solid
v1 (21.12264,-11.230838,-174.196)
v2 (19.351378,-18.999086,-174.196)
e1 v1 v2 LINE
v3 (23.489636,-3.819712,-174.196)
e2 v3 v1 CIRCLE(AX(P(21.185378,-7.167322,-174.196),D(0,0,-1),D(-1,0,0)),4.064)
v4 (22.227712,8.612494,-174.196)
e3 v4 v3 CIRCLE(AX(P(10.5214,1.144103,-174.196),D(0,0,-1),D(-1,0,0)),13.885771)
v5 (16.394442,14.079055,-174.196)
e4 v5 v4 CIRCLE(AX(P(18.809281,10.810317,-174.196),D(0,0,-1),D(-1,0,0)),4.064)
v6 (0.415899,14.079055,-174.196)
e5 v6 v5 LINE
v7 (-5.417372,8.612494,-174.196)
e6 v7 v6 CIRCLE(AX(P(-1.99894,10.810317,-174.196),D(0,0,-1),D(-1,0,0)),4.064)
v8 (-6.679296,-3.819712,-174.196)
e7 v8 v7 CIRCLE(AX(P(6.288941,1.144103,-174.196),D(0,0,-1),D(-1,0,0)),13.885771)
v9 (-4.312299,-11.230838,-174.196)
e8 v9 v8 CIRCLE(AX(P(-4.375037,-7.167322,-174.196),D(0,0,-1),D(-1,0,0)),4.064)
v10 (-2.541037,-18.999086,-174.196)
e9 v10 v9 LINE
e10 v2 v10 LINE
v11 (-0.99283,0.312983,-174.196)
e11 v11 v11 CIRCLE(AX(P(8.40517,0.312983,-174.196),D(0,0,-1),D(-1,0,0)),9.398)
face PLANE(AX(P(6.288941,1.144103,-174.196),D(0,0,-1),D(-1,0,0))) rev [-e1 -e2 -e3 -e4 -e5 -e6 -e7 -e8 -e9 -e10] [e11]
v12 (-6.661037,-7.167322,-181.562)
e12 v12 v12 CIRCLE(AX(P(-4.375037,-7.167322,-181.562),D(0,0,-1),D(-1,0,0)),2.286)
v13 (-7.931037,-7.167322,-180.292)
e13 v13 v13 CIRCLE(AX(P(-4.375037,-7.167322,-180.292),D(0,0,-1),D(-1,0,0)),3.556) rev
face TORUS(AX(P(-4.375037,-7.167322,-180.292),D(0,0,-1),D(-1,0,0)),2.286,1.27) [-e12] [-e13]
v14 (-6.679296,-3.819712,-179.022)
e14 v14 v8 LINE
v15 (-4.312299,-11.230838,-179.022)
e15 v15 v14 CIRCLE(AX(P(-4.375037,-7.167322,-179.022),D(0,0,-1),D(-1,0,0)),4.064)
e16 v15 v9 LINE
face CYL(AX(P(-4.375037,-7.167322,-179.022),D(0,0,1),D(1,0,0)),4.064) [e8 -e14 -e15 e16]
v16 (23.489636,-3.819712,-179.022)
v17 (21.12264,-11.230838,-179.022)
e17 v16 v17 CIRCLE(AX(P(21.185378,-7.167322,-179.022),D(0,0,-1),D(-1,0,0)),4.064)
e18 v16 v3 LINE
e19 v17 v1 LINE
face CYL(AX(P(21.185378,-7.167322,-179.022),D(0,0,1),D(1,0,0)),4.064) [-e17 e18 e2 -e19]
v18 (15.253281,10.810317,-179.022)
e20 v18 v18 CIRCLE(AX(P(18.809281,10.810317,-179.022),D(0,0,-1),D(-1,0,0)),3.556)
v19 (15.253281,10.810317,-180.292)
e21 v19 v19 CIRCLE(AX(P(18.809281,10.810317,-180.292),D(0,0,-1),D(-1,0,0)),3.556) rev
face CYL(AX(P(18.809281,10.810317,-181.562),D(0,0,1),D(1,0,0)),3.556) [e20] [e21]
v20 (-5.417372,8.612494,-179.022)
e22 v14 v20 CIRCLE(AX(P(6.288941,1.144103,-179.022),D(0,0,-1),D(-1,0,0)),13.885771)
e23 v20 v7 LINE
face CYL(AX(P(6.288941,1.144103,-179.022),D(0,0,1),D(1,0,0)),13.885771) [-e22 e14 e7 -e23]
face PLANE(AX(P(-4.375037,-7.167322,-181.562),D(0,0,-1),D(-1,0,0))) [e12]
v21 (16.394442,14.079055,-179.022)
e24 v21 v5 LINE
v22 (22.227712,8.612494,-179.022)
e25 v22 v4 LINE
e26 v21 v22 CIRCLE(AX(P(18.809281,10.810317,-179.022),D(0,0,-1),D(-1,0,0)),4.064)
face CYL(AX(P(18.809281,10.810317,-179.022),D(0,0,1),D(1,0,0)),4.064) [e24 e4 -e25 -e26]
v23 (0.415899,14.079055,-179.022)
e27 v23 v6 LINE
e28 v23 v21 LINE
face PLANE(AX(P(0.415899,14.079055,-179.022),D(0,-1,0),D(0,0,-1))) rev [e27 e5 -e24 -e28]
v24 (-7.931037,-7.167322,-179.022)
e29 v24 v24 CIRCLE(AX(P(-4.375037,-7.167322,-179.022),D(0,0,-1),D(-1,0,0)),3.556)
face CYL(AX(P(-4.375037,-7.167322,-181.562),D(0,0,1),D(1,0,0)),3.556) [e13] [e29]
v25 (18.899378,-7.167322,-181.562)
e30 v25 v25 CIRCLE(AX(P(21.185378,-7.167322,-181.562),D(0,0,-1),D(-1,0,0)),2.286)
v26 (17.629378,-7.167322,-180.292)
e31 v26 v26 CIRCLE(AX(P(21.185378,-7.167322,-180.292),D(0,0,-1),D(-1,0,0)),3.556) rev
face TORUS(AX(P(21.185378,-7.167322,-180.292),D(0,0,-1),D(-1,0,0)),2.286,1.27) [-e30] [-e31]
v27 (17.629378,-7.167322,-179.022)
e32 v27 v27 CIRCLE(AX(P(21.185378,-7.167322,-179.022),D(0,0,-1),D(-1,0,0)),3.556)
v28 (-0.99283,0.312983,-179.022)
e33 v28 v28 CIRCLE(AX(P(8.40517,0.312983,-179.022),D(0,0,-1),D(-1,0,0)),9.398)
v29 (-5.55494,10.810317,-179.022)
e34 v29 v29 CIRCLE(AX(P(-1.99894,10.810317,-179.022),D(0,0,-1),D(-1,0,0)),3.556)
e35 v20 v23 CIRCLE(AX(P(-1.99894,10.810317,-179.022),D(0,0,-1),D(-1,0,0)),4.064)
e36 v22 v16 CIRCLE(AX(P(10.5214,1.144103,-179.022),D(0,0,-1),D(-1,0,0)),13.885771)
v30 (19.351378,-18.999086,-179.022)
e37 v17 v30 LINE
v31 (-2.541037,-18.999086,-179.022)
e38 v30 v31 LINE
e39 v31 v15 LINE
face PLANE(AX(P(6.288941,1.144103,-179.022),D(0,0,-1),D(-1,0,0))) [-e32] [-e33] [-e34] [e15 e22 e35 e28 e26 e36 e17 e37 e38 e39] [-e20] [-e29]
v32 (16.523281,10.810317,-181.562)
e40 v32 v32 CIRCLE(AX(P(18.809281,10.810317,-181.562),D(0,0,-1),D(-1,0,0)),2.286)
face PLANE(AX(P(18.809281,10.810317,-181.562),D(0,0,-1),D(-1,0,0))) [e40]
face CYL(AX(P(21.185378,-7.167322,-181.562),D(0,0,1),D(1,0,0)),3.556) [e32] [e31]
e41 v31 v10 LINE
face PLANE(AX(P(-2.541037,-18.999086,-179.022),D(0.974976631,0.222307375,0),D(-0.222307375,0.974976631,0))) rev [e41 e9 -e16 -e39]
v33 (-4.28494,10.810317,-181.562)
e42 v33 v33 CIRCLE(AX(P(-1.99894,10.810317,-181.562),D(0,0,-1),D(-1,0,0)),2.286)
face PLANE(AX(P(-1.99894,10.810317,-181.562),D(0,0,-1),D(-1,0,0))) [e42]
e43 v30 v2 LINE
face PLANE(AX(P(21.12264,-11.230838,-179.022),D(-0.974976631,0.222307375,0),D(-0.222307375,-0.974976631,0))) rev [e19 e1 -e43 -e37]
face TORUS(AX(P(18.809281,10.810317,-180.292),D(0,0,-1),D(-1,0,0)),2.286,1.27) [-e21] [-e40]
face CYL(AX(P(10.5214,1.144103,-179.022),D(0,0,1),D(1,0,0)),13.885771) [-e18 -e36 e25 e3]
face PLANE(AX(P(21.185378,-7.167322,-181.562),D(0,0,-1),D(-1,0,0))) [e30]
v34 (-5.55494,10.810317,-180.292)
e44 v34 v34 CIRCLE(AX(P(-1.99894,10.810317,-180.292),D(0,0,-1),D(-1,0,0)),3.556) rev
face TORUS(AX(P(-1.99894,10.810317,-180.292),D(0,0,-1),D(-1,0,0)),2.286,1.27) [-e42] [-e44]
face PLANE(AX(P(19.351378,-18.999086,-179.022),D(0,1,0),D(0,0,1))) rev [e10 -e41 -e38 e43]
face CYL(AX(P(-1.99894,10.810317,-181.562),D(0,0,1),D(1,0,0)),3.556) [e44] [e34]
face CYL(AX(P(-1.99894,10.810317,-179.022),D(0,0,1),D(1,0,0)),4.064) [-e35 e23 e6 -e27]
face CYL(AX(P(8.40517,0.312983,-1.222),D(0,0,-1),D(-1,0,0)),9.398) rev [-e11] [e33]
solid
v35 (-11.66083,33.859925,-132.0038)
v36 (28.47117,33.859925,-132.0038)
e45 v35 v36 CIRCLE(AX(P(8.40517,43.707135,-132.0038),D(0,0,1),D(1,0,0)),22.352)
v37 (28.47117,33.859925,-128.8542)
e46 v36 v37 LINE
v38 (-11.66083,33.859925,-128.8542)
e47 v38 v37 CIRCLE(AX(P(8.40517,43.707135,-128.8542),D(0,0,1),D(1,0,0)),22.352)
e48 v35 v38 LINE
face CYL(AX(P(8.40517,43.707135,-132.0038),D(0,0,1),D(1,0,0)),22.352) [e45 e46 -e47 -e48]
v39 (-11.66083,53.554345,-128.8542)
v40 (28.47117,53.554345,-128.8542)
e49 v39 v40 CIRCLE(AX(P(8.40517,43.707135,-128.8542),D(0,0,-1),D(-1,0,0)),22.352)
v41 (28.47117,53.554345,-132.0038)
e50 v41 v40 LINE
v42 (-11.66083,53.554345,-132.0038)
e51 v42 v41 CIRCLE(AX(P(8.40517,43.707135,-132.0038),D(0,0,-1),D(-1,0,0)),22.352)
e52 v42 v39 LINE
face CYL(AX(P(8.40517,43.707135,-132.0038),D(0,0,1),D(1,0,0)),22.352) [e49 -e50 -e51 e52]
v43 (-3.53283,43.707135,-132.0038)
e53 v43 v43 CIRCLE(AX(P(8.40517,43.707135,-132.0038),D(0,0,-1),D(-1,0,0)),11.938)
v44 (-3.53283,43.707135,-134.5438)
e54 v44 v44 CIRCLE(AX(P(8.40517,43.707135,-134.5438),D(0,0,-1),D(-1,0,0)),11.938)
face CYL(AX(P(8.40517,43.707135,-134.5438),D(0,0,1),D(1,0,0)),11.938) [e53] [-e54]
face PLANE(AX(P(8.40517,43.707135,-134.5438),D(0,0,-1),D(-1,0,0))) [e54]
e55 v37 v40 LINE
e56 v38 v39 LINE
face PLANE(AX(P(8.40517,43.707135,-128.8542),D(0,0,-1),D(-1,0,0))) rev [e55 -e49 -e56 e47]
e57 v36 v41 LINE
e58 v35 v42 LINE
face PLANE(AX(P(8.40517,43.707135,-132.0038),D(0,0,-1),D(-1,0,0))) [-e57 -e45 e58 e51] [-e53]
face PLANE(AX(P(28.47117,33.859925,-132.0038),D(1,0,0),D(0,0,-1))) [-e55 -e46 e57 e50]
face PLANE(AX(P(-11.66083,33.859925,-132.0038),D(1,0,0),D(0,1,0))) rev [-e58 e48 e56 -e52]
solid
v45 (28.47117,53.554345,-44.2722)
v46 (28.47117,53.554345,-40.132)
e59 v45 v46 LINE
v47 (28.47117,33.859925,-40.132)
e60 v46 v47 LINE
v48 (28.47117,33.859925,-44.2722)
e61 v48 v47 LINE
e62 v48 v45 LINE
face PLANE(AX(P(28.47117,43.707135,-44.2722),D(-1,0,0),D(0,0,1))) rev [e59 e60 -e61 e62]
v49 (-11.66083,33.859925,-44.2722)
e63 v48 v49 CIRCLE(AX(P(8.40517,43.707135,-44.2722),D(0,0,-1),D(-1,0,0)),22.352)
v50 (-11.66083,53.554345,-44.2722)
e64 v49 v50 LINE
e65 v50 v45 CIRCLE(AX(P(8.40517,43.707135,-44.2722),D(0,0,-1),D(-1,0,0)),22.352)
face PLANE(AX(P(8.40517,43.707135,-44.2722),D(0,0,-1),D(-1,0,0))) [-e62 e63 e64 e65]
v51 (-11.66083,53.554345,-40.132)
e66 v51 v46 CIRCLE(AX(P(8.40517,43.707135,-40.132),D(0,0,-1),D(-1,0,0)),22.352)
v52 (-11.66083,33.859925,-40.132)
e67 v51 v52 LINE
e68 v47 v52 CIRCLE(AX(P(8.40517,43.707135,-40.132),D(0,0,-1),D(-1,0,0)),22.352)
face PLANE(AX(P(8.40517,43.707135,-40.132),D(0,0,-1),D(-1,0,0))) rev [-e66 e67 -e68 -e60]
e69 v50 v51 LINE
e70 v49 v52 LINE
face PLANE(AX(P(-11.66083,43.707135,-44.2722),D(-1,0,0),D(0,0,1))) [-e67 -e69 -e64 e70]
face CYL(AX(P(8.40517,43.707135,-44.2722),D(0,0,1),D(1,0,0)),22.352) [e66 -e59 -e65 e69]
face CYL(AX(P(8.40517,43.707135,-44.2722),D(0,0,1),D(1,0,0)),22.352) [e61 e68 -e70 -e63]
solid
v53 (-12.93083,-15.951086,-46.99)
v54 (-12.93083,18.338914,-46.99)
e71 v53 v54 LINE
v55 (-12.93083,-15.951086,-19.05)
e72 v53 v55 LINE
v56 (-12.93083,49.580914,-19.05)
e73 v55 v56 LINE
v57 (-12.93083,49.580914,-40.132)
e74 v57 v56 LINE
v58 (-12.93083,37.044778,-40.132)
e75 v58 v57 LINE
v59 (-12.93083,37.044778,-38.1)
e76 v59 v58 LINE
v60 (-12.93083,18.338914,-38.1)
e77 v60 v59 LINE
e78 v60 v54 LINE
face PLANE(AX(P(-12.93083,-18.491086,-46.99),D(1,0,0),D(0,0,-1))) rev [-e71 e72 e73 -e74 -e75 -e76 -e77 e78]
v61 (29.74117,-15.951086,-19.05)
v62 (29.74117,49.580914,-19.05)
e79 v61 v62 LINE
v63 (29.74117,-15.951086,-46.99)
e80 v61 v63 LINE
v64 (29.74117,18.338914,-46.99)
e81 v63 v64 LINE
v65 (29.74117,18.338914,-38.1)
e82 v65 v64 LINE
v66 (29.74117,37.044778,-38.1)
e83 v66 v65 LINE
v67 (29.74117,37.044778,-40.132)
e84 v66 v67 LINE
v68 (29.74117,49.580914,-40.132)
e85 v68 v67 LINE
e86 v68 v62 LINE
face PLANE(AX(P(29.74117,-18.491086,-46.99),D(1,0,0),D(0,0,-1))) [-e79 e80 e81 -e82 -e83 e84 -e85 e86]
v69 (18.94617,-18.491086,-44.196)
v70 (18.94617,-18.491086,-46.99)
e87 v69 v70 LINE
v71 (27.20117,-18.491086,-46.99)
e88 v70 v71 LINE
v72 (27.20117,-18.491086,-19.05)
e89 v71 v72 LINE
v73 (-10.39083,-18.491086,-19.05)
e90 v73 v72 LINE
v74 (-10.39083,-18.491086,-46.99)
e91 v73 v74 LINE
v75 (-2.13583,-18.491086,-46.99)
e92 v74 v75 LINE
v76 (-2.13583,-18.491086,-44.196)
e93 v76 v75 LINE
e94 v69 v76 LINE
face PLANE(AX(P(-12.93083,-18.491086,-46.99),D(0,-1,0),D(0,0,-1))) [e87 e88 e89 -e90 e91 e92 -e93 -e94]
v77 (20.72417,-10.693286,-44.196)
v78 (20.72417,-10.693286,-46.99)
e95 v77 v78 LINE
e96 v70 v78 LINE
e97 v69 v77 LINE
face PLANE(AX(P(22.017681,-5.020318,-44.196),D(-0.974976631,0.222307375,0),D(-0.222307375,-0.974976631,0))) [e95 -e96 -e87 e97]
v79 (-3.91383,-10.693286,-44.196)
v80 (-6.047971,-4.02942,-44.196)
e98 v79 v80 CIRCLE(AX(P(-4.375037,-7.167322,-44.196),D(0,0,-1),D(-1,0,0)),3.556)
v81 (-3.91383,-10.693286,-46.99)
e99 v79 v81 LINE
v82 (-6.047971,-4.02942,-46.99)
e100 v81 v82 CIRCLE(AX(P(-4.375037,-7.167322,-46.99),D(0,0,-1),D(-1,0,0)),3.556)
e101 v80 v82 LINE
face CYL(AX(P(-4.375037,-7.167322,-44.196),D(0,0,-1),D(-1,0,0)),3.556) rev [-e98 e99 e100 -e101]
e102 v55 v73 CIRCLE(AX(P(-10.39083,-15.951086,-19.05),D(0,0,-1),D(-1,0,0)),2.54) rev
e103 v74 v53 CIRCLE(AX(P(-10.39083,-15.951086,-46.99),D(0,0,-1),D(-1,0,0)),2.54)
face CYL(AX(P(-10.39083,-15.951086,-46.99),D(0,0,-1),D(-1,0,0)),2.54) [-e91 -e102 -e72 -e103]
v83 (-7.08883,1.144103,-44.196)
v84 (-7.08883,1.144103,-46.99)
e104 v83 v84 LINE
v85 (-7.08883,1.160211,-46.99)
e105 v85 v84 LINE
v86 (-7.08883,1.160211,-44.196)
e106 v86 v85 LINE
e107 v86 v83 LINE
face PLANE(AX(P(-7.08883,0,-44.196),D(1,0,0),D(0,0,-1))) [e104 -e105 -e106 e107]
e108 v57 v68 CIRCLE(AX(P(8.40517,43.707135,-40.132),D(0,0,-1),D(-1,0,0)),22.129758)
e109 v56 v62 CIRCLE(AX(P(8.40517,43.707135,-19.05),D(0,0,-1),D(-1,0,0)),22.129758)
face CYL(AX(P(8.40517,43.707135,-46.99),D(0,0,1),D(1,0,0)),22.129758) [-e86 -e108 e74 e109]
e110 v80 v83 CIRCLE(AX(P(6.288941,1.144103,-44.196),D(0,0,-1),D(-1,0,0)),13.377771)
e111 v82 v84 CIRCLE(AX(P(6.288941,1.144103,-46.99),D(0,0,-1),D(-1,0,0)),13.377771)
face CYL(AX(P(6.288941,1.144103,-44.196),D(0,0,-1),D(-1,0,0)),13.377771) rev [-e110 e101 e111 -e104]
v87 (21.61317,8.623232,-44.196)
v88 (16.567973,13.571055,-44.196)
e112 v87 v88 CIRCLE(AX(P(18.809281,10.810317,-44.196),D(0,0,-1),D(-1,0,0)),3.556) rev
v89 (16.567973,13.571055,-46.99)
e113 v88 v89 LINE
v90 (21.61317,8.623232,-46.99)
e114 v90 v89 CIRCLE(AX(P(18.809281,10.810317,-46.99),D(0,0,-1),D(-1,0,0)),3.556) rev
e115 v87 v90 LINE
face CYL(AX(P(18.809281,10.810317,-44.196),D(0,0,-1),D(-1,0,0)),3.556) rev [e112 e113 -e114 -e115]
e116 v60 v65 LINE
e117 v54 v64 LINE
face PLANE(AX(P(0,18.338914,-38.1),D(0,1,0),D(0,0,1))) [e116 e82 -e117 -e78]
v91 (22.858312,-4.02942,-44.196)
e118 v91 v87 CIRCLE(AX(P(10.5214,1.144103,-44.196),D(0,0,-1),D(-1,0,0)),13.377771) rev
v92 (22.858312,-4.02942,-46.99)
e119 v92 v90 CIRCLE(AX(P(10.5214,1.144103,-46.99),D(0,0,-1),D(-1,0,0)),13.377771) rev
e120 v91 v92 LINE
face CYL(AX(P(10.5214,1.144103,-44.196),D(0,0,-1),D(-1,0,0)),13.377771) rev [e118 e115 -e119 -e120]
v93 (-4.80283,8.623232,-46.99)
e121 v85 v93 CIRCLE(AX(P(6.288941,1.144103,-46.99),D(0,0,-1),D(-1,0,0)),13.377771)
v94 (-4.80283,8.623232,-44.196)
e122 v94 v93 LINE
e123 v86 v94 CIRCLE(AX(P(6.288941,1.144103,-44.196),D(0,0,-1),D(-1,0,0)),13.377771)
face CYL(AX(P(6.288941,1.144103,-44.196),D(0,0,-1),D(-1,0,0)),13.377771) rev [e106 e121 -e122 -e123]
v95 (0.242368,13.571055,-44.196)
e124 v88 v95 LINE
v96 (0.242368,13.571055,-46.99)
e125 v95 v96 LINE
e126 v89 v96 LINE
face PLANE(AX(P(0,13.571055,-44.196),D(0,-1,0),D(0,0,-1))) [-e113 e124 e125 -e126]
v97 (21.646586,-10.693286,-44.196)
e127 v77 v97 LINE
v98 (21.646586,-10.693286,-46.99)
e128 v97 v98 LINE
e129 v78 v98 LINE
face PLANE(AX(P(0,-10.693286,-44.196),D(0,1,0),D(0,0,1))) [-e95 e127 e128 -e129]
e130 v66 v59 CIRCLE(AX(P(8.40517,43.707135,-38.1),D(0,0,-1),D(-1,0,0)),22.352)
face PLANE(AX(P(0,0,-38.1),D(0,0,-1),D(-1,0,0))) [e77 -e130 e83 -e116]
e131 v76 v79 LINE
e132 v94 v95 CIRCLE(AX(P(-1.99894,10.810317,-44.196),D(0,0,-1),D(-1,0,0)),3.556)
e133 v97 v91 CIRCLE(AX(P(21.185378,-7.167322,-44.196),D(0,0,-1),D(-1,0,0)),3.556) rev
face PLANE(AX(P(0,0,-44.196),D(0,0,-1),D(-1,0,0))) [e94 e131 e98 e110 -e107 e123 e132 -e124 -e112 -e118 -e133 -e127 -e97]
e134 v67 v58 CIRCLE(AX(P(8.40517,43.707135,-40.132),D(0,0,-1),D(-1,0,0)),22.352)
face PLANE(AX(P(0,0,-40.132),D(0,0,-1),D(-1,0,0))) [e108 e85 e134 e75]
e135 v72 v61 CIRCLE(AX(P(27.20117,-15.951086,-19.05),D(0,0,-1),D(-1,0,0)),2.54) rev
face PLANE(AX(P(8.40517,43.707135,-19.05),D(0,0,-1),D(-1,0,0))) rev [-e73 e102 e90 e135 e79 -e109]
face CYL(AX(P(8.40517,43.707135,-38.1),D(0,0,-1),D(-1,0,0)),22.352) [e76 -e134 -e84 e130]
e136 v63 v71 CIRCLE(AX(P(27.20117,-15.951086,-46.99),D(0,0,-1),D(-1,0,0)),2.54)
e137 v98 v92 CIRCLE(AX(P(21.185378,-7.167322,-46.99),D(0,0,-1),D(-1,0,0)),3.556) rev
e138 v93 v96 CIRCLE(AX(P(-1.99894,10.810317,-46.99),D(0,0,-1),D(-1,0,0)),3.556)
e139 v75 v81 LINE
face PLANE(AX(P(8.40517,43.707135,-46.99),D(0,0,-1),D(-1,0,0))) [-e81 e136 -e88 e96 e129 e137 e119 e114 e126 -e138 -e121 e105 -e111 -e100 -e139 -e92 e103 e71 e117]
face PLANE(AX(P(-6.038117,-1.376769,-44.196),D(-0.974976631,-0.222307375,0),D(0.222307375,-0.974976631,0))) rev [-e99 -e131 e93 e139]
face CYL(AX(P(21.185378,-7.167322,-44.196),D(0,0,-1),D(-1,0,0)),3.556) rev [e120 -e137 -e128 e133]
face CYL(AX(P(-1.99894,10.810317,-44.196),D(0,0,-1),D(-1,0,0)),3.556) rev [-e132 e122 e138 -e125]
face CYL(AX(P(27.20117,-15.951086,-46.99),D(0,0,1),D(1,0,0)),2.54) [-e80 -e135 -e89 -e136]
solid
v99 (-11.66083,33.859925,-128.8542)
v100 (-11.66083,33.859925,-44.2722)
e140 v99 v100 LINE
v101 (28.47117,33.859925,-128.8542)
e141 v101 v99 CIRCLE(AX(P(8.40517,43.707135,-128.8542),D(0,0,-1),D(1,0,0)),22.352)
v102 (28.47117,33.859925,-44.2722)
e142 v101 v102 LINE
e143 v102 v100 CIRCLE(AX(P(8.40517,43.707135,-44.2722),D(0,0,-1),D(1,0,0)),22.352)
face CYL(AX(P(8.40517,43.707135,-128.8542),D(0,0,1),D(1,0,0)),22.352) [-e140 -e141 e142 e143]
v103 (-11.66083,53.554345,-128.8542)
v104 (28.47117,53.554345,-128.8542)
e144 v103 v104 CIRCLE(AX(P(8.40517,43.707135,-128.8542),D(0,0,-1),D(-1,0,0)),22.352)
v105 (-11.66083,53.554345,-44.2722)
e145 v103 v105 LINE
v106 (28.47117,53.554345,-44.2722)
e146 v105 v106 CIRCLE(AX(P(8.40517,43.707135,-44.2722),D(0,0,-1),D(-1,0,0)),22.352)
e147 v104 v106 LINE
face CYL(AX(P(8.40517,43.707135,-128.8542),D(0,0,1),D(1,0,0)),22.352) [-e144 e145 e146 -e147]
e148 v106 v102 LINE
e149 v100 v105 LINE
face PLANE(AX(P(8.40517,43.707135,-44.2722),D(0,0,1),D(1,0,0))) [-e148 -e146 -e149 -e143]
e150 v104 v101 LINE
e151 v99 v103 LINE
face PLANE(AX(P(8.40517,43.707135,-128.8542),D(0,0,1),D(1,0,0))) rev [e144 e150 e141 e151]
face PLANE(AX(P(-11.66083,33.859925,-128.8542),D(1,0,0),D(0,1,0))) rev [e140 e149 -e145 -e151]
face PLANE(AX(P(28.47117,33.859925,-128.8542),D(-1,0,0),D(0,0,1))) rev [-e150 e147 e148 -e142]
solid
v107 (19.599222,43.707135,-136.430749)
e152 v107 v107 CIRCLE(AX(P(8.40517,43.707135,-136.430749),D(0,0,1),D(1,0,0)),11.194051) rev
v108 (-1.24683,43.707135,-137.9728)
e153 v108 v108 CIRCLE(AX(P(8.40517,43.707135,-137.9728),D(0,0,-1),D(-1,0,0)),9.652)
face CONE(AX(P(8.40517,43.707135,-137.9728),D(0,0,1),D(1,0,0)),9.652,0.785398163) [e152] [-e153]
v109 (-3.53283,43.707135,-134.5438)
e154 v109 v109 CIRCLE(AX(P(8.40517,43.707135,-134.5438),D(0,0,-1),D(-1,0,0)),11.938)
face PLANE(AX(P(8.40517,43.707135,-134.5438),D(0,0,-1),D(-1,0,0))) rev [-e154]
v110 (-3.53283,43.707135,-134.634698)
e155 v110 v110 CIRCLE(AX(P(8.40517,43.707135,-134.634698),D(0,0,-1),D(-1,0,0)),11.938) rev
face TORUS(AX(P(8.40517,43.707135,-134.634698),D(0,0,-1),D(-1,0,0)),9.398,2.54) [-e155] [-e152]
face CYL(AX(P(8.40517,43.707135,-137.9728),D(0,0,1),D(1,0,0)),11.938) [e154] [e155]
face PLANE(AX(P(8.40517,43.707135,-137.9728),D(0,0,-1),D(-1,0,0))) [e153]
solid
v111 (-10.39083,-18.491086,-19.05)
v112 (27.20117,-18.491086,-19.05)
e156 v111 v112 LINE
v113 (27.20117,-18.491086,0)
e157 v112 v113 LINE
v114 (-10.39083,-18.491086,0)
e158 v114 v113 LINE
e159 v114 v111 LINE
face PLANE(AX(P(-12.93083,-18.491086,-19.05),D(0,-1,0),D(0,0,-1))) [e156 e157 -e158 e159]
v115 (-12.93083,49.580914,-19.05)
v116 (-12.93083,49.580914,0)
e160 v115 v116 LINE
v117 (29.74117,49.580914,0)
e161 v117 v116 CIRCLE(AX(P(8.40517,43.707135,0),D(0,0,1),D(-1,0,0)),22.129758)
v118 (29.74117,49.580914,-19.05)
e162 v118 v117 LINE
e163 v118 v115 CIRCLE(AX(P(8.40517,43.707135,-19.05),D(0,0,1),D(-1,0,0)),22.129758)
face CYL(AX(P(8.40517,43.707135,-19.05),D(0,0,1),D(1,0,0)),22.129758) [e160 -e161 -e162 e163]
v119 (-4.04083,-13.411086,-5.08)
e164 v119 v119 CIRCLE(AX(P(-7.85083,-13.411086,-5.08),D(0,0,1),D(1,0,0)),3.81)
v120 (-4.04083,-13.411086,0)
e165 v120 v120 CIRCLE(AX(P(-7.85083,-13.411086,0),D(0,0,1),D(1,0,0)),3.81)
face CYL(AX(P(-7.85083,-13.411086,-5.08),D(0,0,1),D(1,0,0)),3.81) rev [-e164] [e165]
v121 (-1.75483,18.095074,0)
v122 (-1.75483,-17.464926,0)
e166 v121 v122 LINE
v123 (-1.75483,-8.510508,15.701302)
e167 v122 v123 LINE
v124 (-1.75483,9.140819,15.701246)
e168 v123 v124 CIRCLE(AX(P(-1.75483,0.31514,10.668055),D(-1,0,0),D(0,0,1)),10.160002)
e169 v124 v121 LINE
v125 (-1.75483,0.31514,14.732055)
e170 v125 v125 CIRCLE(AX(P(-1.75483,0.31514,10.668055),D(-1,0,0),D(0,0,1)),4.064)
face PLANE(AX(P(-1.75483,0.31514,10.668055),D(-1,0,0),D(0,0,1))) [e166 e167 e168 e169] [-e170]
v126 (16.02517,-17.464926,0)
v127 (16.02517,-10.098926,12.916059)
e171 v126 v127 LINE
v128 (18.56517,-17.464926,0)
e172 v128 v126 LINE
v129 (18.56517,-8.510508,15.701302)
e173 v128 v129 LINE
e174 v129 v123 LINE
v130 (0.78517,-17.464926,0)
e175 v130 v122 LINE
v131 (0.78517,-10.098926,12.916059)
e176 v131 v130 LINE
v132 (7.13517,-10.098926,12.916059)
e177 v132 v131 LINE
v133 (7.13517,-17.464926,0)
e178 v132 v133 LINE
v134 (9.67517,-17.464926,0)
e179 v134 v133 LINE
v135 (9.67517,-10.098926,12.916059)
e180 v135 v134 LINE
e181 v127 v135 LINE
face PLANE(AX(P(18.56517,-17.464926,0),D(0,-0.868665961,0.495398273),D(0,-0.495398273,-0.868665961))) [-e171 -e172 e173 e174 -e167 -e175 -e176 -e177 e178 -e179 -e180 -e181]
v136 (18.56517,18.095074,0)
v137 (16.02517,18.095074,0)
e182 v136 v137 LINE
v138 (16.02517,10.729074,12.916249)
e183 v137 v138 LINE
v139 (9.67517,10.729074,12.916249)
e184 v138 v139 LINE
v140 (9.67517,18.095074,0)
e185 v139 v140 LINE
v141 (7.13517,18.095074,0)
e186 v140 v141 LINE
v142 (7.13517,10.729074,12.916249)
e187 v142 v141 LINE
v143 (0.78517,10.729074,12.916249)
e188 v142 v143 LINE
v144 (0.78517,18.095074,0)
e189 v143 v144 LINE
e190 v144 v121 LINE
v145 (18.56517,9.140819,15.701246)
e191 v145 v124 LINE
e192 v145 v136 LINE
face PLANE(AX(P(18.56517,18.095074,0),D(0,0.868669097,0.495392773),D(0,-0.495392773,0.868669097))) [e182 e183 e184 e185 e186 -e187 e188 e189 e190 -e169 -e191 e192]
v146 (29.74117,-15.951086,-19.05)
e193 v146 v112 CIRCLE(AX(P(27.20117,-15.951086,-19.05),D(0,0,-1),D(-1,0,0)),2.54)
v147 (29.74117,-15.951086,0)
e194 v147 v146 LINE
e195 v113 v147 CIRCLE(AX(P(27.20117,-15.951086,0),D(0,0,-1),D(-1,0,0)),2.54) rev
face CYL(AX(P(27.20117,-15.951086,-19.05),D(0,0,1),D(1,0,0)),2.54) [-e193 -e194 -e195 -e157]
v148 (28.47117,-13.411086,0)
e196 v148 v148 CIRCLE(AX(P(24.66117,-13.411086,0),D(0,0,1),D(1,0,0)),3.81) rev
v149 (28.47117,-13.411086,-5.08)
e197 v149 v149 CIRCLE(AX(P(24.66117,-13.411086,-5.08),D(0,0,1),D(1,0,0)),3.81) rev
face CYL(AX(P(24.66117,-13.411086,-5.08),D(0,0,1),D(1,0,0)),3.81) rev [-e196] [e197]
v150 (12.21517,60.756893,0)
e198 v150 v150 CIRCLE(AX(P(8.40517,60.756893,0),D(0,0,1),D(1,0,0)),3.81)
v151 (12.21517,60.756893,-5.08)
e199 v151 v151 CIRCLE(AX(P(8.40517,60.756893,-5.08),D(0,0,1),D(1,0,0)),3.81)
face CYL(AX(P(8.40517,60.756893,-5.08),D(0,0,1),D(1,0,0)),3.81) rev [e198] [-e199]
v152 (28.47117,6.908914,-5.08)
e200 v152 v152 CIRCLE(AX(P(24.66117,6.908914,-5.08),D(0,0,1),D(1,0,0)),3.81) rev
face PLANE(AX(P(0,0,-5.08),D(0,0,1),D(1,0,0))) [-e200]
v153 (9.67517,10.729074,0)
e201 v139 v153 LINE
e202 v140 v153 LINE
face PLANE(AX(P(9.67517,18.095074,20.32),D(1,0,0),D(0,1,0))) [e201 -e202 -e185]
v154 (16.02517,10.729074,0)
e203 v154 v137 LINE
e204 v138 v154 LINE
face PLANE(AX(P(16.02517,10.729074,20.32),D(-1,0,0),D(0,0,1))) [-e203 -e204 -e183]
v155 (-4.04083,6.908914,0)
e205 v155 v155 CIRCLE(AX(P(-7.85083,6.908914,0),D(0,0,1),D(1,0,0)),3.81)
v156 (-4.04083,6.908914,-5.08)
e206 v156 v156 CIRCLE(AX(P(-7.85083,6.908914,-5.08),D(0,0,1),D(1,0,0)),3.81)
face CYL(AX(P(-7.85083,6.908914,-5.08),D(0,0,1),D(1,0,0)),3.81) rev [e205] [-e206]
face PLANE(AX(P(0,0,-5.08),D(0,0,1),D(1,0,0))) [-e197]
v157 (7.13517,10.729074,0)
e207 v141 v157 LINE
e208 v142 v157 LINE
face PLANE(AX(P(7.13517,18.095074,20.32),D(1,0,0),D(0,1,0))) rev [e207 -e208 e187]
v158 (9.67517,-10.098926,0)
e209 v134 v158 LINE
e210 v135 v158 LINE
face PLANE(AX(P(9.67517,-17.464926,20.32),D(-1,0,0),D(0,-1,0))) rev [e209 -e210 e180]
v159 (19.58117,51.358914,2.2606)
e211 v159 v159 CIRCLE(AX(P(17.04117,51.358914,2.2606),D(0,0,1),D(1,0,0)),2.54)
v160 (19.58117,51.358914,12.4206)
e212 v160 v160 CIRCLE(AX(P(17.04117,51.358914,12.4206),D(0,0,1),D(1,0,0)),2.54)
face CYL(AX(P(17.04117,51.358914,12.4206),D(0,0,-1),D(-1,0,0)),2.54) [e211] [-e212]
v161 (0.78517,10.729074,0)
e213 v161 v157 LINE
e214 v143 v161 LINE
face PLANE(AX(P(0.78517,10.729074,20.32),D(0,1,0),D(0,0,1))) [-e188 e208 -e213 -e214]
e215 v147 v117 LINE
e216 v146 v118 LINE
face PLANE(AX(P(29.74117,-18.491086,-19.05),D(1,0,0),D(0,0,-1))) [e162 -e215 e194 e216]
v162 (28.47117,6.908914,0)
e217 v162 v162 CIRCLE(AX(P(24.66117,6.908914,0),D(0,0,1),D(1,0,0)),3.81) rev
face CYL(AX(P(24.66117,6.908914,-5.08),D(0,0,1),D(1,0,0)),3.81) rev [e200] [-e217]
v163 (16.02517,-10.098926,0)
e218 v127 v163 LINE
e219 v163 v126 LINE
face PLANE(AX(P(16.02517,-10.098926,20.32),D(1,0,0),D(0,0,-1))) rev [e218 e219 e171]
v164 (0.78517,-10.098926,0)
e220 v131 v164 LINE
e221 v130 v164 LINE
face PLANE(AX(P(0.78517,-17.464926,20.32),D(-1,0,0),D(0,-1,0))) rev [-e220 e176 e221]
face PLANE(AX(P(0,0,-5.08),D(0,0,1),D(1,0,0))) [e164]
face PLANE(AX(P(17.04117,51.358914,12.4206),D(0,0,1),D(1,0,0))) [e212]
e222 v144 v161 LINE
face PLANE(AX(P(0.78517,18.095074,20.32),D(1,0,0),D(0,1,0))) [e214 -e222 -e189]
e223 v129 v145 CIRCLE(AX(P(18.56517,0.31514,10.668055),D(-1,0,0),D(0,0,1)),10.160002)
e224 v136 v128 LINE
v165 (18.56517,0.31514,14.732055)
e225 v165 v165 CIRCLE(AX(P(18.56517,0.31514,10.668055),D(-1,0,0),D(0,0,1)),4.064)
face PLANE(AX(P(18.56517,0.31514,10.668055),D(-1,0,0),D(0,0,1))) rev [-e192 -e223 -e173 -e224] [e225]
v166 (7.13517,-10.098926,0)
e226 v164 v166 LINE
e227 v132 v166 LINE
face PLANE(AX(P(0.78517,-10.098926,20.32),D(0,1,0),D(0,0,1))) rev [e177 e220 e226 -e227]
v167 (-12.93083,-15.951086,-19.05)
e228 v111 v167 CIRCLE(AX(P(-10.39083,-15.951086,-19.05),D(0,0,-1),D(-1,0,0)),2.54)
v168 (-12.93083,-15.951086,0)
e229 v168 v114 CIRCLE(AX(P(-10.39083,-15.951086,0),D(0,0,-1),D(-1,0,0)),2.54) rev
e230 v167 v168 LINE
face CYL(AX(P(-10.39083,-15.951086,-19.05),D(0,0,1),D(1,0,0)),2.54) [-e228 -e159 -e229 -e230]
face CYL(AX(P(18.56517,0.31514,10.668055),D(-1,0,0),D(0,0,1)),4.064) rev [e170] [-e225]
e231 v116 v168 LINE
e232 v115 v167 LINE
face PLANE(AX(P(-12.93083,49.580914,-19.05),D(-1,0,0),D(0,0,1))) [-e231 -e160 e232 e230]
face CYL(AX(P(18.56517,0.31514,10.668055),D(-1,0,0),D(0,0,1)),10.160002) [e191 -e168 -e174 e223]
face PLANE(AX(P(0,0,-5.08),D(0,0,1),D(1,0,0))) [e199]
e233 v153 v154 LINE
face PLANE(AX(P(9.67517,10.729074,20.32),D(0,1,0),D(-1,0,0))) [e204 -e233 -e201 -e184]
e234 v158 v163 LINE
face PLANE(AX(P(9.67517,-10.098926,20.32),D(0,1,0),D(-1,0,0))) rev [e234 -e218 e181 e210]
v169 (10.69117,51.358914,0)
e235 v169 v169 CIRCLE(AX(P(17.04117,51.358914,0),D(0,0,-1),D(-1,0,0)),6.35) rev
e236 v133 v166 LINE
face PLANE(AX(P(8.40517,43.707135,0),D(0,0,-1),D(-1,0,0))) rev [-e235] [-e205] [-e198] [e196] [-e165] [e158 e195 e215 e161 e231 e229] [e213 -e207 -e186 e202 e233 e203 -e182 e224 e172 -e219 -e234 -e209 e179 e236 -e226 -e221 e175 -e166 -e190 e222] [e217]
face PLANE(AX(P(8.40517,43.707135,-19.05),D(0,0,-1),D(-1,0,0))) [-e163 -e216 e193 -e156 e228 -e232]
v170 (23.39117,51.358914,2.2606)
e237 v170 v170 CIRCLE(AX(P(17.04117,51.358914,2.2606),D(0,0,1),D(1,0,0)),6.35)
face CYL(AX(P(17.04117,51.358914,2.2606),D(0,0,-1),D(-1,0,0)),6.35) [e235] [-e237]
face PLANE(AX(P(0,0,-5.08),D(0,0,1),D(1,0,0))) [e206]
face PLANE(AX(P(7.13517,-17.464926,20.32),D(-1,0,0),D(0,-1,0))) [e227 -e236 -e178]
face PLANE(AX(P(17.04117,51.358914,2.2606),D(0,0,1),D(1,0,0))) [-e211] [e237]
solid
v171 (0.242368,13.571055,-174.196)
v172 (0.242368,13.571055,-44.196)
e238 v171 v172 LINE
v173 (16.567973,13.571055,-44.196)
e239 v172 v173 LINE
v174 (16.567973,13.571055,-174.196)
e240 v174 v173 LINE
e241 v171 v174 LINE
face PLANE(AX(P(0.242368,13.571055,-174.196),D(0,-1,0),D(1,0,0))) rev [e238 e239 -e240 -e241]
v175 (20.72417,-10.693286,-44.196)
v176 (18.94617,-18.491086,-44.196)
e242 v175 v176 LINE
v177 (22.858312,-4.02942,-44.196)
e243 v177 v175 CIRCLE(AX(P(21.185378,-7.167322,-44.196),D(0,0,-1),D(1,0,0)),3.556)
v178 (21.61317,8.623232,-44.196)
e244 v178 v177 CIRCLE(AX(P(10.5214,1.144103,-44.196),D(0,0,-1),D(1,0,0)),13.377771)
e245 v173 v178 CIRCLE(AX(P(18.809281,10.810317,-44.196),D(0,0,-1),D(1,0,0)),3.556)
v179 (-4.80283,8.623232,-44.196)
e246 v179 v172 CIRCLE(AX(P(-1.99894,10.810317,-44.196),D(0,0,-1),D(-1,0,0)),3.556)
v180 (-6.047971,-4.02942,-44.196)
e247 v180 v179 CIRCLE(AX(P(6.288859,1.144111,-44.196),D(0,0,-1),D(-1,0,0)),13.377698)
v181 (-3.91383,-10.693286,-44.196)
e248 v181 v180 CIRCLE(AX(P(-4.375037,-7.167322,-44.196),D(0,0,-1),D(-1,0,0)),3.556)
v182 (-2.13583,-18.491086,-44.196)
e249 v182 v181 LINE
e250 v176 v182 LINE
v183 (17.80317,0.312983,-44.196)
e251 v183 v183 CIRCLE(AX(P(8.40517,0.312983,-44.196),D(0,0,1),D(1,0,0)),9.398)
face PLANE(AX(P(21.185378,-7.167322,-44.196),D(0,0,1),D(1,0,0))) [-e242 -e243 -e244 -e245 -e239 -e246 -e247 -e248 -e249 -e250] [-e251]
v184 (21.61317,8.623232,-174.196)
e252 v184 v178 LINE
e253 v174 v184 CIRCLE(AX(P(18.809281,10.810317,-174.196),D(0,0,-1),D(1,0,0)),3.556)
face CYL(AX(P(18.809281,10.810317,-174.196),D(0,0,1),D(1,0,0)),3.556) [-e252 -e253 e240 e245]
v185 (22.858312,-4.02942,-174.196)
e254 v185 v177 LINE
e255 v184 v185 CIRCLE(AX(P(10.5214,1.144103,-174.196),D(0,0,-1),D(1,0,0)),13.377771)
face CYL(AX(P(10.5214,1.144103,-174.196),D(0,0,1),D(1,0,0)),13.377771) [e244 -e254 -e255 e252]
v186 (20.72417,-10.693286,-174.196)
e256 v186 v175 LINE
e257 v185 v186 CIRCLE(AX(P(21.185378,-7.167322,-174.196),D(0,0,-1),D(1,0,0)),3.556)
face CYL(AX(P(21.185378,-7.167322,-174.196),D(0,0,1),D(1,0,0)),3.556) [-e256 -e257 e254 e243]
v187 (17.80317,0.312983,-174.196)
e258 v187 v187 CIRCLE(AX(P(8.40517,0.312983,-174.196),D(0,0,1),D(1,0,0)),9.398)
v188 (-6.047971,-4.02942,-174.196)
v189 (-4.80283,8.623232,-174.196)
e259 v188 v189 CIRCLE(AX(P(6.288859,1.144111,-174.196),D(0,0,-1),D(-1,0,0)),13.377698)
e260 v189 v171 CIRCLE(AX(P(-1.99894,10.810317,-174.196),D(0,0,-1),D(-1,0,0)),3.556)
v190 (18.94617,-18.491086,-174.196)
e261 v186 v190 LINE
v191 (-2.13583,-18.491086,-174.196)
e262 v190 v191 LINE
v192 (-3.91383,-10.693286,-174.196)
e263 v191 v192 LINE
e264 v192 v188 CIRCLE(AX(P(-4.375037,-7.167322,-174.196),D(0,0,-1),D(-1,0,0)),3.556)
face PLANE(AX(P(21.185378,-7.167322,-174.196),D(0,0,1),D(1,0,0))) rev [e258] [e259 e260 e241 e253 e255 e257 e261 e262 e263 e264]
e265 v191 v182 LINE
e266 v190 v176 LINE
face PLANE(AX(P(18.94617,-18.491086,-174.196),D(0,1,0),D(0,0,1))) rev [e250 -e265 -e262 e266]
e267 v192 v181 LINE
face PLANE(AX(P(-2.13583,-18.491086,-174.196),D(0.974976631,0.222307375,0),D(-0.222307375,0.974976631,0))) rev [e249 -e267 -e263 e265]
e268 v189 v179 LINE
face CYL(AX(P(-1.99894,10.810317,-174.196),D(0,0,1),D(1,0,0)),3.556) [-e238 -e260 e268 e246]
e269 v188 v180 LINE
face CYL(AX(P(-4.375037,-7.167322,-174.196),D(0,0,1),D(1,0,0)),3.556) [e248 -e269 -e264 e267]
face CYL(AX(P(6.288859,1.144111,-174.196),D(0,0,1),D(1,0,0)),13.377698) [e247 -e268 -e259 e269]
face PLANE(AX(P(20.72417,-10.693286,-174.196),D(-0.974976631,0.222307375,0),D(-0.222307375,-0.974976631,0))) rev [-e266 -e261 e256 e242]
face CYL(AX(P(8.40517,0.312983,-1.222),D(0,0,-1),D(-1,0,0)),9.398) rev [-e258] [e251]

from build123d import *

# Parameters (mm, degrees)
BOSS_EXTRUDE1_DEPTH  = 19.05
SKETCH6_R            = 3.81
CUT_EXTRUDE2_DEPTH   = 5.08
SKETCH12_R           = 3.81
CUT_EXTRUDE3_DEPTH   = 5.08
BOSS_EXTRUDE11_DEPTH = 27.94
CUT_EXTRUDE4_DEPTH   = 8.89
CUT_EXTRUDE5_START   = -6.858
CUT_EXTRUDE5_DEPTH   = 6.858
BOSS_EXTRUDE13_DEPTH = 4.1402
BOSS_EXTRUDE14_DEPTH = 84.582
BOSS_EXTRUDE16_DEPTH = 3.1496
SKETCH26_R           = 11.938
BOSS_EXTRUDE17_DEPTH = 2.54
SKETCH27_R           = 11.938
BOSS_EXTRUDE20_DEPTH = 3.429
CHAMFER1_SIZE        = 2.286
FILLET11_R           = 2.54
CUT_EXTRUDE6_START   = -2.794
CUT_EXTRUDE6_DEPTH   = 2.794
BOSS_EXTRUDE21_DEPTH = 130
BOSS_EXTRUDE23_DEPTH = 4.826
SKETCH32_R           = 9.398
BOSS_EXTRUDE24_DEPTH = 8.128
SKETCH43_R           = 3.556
BOSS_EXTRUDE26_DEPTH = 2.54
FILLET13_R           = 1.27
SKETCH44_R           = 6.35
BOSS_EXTRUDE27_DEPTH = 2.2606
SKETCH45_R           = 2.54
BOSS_EXTRUDE28_DEPTH = 10.16
BOSS_EXTRUDE29_START = -11.176
SKETCH3_R            = 4.064
BOSS_EXTRUDE29_DEPTH = 20.32
SKETCH46_W           = 6.35
SKETCH46_H           = 7.366
CUT_EXTRUDE9_DEPTH   = 20.32
MOVE_START           = -1.75482957
MOVE_FACE1_DEPTH     = 20.32
MOVE_START_2         = 0.78517043
MOVE_FACE1_2_DEPTH   = 6.35
MOVE_START_3         = 9.67517043
MOVE_FACE1_3_DEPTH   = 6.35
MOVE_FACE1_4_DEPTH   = 20.32
MOVE_FACE1_5_DEPTH   = 2.54
MOVE_START_4         = 7.13517043
MOVE_FACE1_6_DEPTH   = 2.54
MOVE_START_5         = 16.02517043
MOVE_FACE1_7_DEPTH   = 2.54
FILLET14_R           = 2.54
FILLET15_R           = 2.54
SKETCH34_R           = 9.398
CUT_EXTRUDE11_DEPTH  = 185.928


# Read off the part's stored shape, not the designer's step: Cut-Extrude6, Move Face1
with BuildPart() as part:
    # Sketch1 → Boss-Extrude1 (new body)
    with BuildSketch(Plane.XY):
        with BuildLine():
            Line((-12.93082957, -18.491086285), (29.74117043, -18.491086285))
            Line((29.74117043, -18.491086285), (29.74117043, 49.580913715))
            ThreePointArc((29.74117043, 49.580913715), (8.40517043, 65.836892729), (-12.93082957, 49.580913715))
            Line((-12.93082957, 49.580913715), (-12.93082957, -18.491086285))
        make_face()
    extrude(amount=-BOSS_EXTRUDE1_DEPTH)

    # Sketch6 → Cut-Extrude2 (cut)
    with BuildSketch(Plane.XY):
        with Locations((-7.85082957, 6.908913715)):
            Circle(SKETCH6_R)
        with Locations((-7.85082957, -13.411086285)):
            Circle(SKETCH6_R)
        with Locations((24.66117043, 6.908913715)):
            Circle(SKETCH6_R)
        with Locations((24.66117043, -13.411086285)):
            Circle(SKETCH6_R)
    extrude(amount=-CUT_EXTRUDE2_DEPTH, mode=Mode.SUBTRACT)

    # Sketch12 → Cut-Extrude3 (cut)
    with BuildSketch(Plane.XY):
        with Locations((8.40517043, 60.756892729)):
            Circle(SKETCH12_R)
    extrude(amount=-CUT_EXTRUDE3_DEPTH, mode=Mode.SUBTRACT)

    # Sketch44 → Boss-Extrude27 (add)
    with BuildSketch(Plane.XY):
        with Locations(Location((17.04117043, 51.358913715, 0), (0, 0, 180))):
            Circle(SKETCH44_R)
    extrude(amount=BOSS_EXTRUDE27_DEPTH)

    # Sketch45 → Boss-Extrude28 (add)
    with BuildSketch(Plane.XY.offset(2.2606)):
        with Locations((17.04117043, 51.358913715)):
            Circle(SKETCH45_R)
    extrude(amount=BOSS_EXTRUDE28_DEPTH)

    # Sketch3 → Boss-Extrude29 (add)
    with BuildSketch(Plane.ZY.offset(12.93082957).offset(BOSS_EXTRUDE29_START)):
        with BuildLine():
            Line((0, -16.662286285), (0, 1.117779576))
            Line((0, 1.117779576), (0, 18.897713715))
            Line((0, 18.897713715), (15.701246407, 9.943459406))
            ThreePointArc((15.701246407, 9.943459406), (20.828056876, 1.117811735), (15.701302277, -7.70786839))
            Line((15.701302277, -7.70786839), (0, -16.662286285))
        make_face()
        with Locations((10.668054799, 1.117779576)):
            Circle(SKETCH3_R, mode=Mode.SUBTRACT)
    extrude(amount=-BOSS_EXTRUDE29_DEPTH)

    # Sketch46 → Cut-Extrude9 (cut)
    with BuildSketch(Plane.XY):
        with Locations((3.96017043, 15.214713715)):
            Rectangle(SKETCH46_W, SKETCH46_H)
        with Locations((12.85017043, 15.214713715)):
            Rectangle(SKETCH46_W, SKETCH46_H)
        with Locations((3.96017043, -12.979286285)):
            Rectangle(SKETCH46_W, SKETCH46_H)
        with Locations((12.85017043, -12.979286285)):
            Rectangle(SKETCH46_W, SKETCH46_H)
    extrude(amount=CUT_EXTRUDE9_DEPTH, mode=Mode.SUBTRACT)

    # Move Face1 outline → Move Face1 (cut)
    with BuildSketch(Plane.YZ.offset(MOVE_START)):
        with BuildLine():
            Line((9.140819406, 15.701246407), (18.095073715, 0))
            Line((18.095073715, 0), (18.897713715, 0))
            Line((18.897713715, 0), (9.943459406, 15.701246407))
            ThreePointArc((9.943459406, 15.701246407), (6.046592425, 19.552448201), (0.716459577, 20.820127714))
            ThreePointArc((0.716459577, 20.820127714), (5.591039303, 19.350826493), (9.140819406, 15.701246407))
        make_face()
        with BuildLine():
            ThreePointArc((0.716459576, 6.623918518), (-2.946220424, 10.668054799), (0.716459576, 14.71219108))
            ThreePointArc((0.716459576, 14.71219108), (-3.748860424, 10.668054799), (0.716459576, 6.623918518))
        make_face()
    extrude(amount=MOVE_FACE1_DEPTH, mode=Mode.SUBTRACT)

    # Move Face1 2 outline → Move Face1 2 (cut)
    with BuildSketch(Plane.YZ.offset(MOVE_START_2)):
        Polygon((11.531713715, 11.508823522), (10.729073716, 12.916249308), (10.729073715, 0), (11.531713715, 0), align=None)
    extrude(amount=MOVE_FACE1_2_DEPTH, mode=Mode.SUBTRACT)

    # Move Face1 3 outline → Move Face1 3 (cut)
    with BuildSketch(Plane.YZ.offset(MOVE_START_3)):
        Polygon((11.531713715, 11.508823522), (10.729073716, 12.916249308), (10.729073715, 0), (11.531713715, 0), align=None)
    extrude(amount=MOVE_FACE1_3_DEPTH, mode=Mode.SUBTRACT)

    # Move Face1 4 outline → Move Face1 4 (add)
    with BuildSketch(Plane.YZ.offset(MOVE_START)):
        with BuildLine():
            ThreePointArc((-7.70786839, 15.701302277), (-4.158092666, 19.350843192), (0.716459577, 20.820127714))
            ThreePointArc((0.716459577, 20.820127714), (-4.61364515, 19.552463801), (-8.51050839, 15.701302277))
            Line((-8.51050839, 15.701302277), (-10.098926285, 12.916059306))
            Line((-10.098926285, 12.916059306), (-10.098926285, 0))
            Line((-10.098926285, 0), (-9.296286285, 0))
            Line((-9.296286285, 0), (-9.296286285, 12.916059306))
            Line((-9.296286285, 12.916059306), (-7.70786839, 15.701302277))
        make_face()
        with BuildLine():
            ThreePointArc((0.716459576, 14.71219108), (4.379139576, 10.668054799), (0.716459576, 6.623918518))
            ThreePointArc((0.716459576, 6.623918518), (5.181779576, 10.668054799), (0.716459576, 14.71219108))
        make_face()
    extrude(amount=MOVE_FACE1_4_DEPTH)

    # Move Face1 5 outline → Move Face1 5 (add)
    with BuildSketch(Plane.YZ.offset(MOVE_START)):
        Polygon((-10.098926285, 11.508654222), (-10.098926285, 12.916059306), (-17.464926285, 0), (-16.662286285, 0), align=None)
    extrude(amount=MOVE_FACE1_5_DEPTH)

    # Move Face1 6 outline → Move Face1 6 (add)
    with BuildSketch(Plane.YZ.offset(MOVE_START_4)):
        Polygon((-10.098926285, 11.508654222), (-10.098926285, 12.916059306), (-17.464926285, 0), (-16.662286285, 0), align=None)
    extrude(amount=MOVE_FACE1_6_DEPTH)

    # Move Face1 7 outline → Move Face1 7 (add)
    with BuildSketch(Plane.YZ.offset(MOVE_START_5)):
        Polygon((-10.098926285, 11.508654222), (-10.098926285, 12.916059306), (-17.464926285, 0), (-16.662286285, 0), align=None)
    extrude(amount=MOVE_FACE1_7_DEPTH)

    # Fillet14
    fillet14_edges = [part.edges().sort_by_distance(p)[0] for p in [
        (29.74117043, -18.491086285, -9.525),
        (-12.93082957, -18.491086285, -9.525),
    ]]
    fillet(fillet14_edges, radius=FILLET14_R)


with BuildPart() as body_2:
    # Sketch17 → Boss-Extrude11 (new body)
    with BuildSketch(Plane(origin=(0, 0, -19.05), x_dir=(-1, 0, 0), z_dir=(0, 0, -1))):
        with BuildLine():
            Line((12.93082957, -18.491086285), (-29.74117043, -18.491086285))
            Line((-29.74117043, -18.491086285), (-29.74117043, 49.580913715))
            ThreePointArc((-29.74117043, 49.580913715), (-8.40517043, 65.836892729), (12.93082957, 49.580913715))
            Line((12.93082957, 49.580913715), (12.93082957, -18.491086285))
        make_face()
    extrude(amount=BOSS_EXTRUDE11_DEPTH)

    # Sketch18 → Cut-Extrude4 (cut)
    with BuildSketch(Plane(origin=(0, 0, -46.99), x_dir=(-1, 0, 0), z_dir=(0, 0, -1))):
        with BuildLine():
            Line((-29.74117043, 18.338913715), (12.93082957, 18.338913715))
            Line((12.93082957, 18.338913715), (12.93082957, 37.044777605))
            ThreePointArc((12.93082957, 37.044777605), (-8.40517043, 21.355135146), (-29.74117043, 37.044777605))
            Line((-29.74117043, 37.044777605), (-29.74117043, 18.338913715))
        make_face()
    extrude(amount=-CUT_EXTRUDE4_DEPTH, mode=Mode.SUBTRACT)

    # Sketch18<5> → Cut-Extrude5 (cut)
    with BuildSketch(Plane(origin=(0, 0, -46.99), x_dir=(-1, 0, 0), z_dir=(0, 0, -1)).offset(CUT_EXTRUDE5_START)):
        with BuildLine():
            Line((12.93082957, 49.580913715), (12.93082957, 37.044777605))
            ThreePointArc((12.93082957, 37.044777605), (13.691369751, 40.337444359), (13.94682957, 43.707135146))
            ThreePointArc((13.94682957, 43.707135146), (-11.774861217, 65.803675328), (-29.74117043, 37.044777605))
            Line((-29.74117043, 37.044777605), (-29.74117043, 49.580913715))
            ThreePointArc((-29.74117043, 49.580913715), (-8.40517043, 65.836892729), (12.93082957, 49.580913715))
        make_face()
        with BuildLine():
            ThreePointArc((-29.74117043, 37.044777605), (-8.40517043, 21.355135146), (12.93082957, 37.044777605))
            Line((12.93082957, 37.044777605), (12.93082957, 49.580913715))
            ThreePointArc((12.93082957, 49.580913715), (-8.40517043, 65.836892729), (-29.74117043, 49.580913715))
            Line((-29.74117043, 49.580913715), (-29.74117043, 37.044777605))
        make_face()
    extrude(amount=CUT_EXTRUDE5_DEPTH, mode=Mode.SUBTRACT)

    # Cut-Extrude6 outline → Cut-Extrude6 (cut)
    with BuildSketch(Plane(origin=(0, 0, -46.99), x_dir=(-1, 0, 0), z_dir=(0, 0, -1)).offset(CUT_EXTRUDE6_START)):
        with BuildLine():
            ThreePointArc((-16.567972961, 13.571054992), (-21.299133174, 13.349170074), (-21.61317043, 8.623232021))
            ThreePointArc((-21.61317043, 8.623232021), (-23.83485908, 2.454274355), (-22.858312088, -4.029420203))
            ThreePointArc((-22.858312088, -4.029420203), (-24.684009124, -7.803496663), (-21.646586083, -10.693286285))
            Line((-21.646586083, -10.693286285), (-20.72417043, -10.693286285))
            Line((-20.72417043, -10.693286285), (-18.94617043, -18.491086285))
            Line((-18.94617043, -18.491086285), (2.13582957, -18.491086285))
            Line((2.13582957, -18.491086285), (3.91382957, -10.693286285))
            ThreePointArc((3.91382957, -10.693286285), (7.761606127, -8.251890338), (6.047971228, -4.029420203))
            ThreePointArc((6.047971228, -4.029420203), (6.826033776, -1.49449173), (7.08882957, 1.144102983))
            Line((7.08882957, 1.144102983), (7.088819872, 1.160210788))
            ThreePointArc((7.088819872, 1.160210788), (6.502214683, 5.062148637), (4.80282957, 8.623232021))
            ThreePointArc((4.80282957, 8.623232021), (4.488792314, 13.349170074), (-0.242367899, 13.571054992))
            Line((-0.242367899, 13.571054992), (-16.567972961, 13.571054992))
        make_face()
    extrude(amount=CUT_EXTRUDE6_DEPTH, mode=Mode.SUBTRACT)

    # Fillet15
    fillet15_edges = [body_2.edges().sort_by_distance(p)[0] for p in [
        (-12.93082957, -18.491086285, -33.02),
        (29.74117043, -18.491086285, -33.02),
    ]]
    fillet(fillet15_edges, radius=FILLET15_R)


with BuildPart() as body_3:
    # Sketch23 → Boss-Extrude13 (new body)
    with BuildSketch(Plane(origin=(0, 0, -40.132), x_dir=(-1, 0, 0), z_dir=(0, 0, -1))):
        with BuildLine():
            Line((11.66082957, 43.707135146), (11.66082957, 33.859924983))
            ThreePointArc((11.66082957, 33.859924983), (-8.40517043, 21.355135146), (-28.47117043, 33.859924983))
            Line((-28.47117043, 33.859924983), (-28.47117043, 43.707135146))
            Line((-28.47117043, 43.707135146), (-28.47117043, 53.554345309))
            ThreePointArc((-28.47117043, 53.554345309), (-8.40517043, 66.059135146), (11.66082957, 53.554345309))
            Line((11.66082957, 53.554345309), (11.66082957, 43.707135146))
        make_face()
    extrude(amount=BOSS_EXTRUDE13_DEPTH)


with BuildPart() as body_4:
    # Sketch24 → Boss-Extrude14 (new body)
    with BuildSketch(Plane(origin=(0, 0, -44.2722), x_dir=(-1, 0, 0), z_dir=(0, 0, -1))):
        with BuildLine():
            Line((11.66082957, 33.859924983), (11.66082957, 53.554345309))
            ThreePointArc((11.66082957, 53.554345309), (-8.40517043, 66.059135146), (-28.47117043, 53.554345309))
            Line((-28.47117043, 53.554345309), (-28.47117043, 33.859924983))
            ThreePointArc((-28.47117043, 33.859924983), (-8.40517043, 21.355135146), (11.66082957, 33.859924983))
        make_face()
    extrude(amount=BOSS_EXTRUDE14_DEPTH)


with BuildPart() as body_5:
    # Sketch25 → Boss-Extrude16 (new body)
    with BuildSketch(Plane(origin=(0, 0, -128.8542), x_dir=(-1, 0, 0), z_dir=(0, 0, -1))):
        with BuildLine():
            Line((11.66082957, 33.859924983), (11.66082957, 53.554345309))
            ThreePointArc((11.66082957, 53.554345309), (-8.40517043, 66.059135146), (-28.47117043, 53.554345309))
            Line((-28.47117043, 53.554345309), (-28.47117043, 33.859924983))
            ThreePointArc((-28.47117043, 33.859924983), (-8.40517043, 21.355135146), (11.66082957, 33.859924983))
        make_face()
    extrude(amount=BOSS_EXTRUDE16_DEPTH)

    # Sketch26 → Boss-Extrude17 (add)
    with BuildSketch(Plane(origin=(0, 0, -132.0038), x_dir=(-1, 0, 0), z_dir=(0, 0, -1))):
        with Locations((-8.40517043, 43.707135146)):
            Circle(SKETCH26_R)
    extrude(amount=BOSS_EXTRUDE17_DEPTH)


with BuildPart() as body_6:
    # Sketch27 → Boss-Extrude20 (new body)
    with BuildSketch(Plane(origin=(0, 0, -134.5438), x_dir=(-1, 0, 0), z_dir=(0, 0, -1))):
        with Locations((-8.40517043, 43.707135146)):
            Circle(SKETCH27_R)
    extrude(amount=BOSS_EXTRUDE20_DEPTH)

    # Chamfer1
    chamfer1_edges = [body_6.edges().sort_by_distance(p)[0] for p in [
        (20.34317043, 43.707135146, -137.9728),
    ]]
    chamfer(chamfer1_edges, length=CHAMFER1_SIZE)

    # Fillet11
    fillet11_edges = [body_6.edges().sort_by_distance(p)[0] for p in [
        (20.34317043, 43.707135146, -135.6868),
    ]]
    fillet(fillet11_edges, radius=FILLET11_R)


with BuildPart() as body_7:
    # Sketch30 → Boss-Extrude21 (new body)
    with BuildSketch(Plane(origin=(0, 0, -44.196), x_dir=(-1, 0, 0), z_dir=(0, 0, -1))):
        with BuildLine():
            Line((-20.72417043, -10.693286285), (-18.94617043, -18.491086285))
            Line((-18.94617043, -18.491086285), (2.13582957, -18.491086285))
            Line((2.13582957, -18.491086285), (3.91382957, -10.693286285))
            ThreePointArc((3.91382957, -10.693286285), (7.761606127, -8.251890338), (6.047971228, -4.029420203))
            ThreePointArc((6.047971228, -4.029420203), (7.024528052, 2.454275322), (4.80282957, 8.623232021))
            ThreePointArc((4.80282957, 8.623232021), (4.488792314, 13.349170074), (-0.242367899, 13.571054992))
            Line((-0.242367899, 13.571054992), (-16.567972961, 13.571054992))
            ThreePointArc((-16.567972961, 13.571054992), (-21.299133174, 13.349170074), (-21.61317043, 8.623232021))
            ThreePointArc((-21.61317043, 8.623232021), (-23.83485908, 2.454274355), (-22.858312088, -4.029420203))
            ThreePointArc((-22.858312088, -4.029420203), (-24.571946987, -8.251890338), (-20.72417043, -10.693286285))
        make_face()
    extrude(amount=BOSS_EXTRUDE21_DEPTH)


with BuildPart() as body_8:
    # Sketch31 → Boss-Extrude23 (new body)
    with BuildSketch(Plane(origin=(0, 0, -174.196), x_dir=(-1, 0, 0), z_dir=(0, 0, -1))):
        with BuildLine():
            Line((-0.415899, 14.079054992), (-16.394441861, 14.079054992))
            ThreePointArc((-16.394441861, 14.079054992), (-21.588241548, 13.775696815), (-22.227712388, 8.612494473))
            ThreePointArc((-22.227712388, 8.612494473), (-24.336184911, 2.546364848), (-23.489636452, -3.819712493))
            ThreePointArc((-23.489636452, -3.819712493), (-25.056721349, -8.403768093), (-21.122639806, -11.230837818))
            Line((-21.122639806, -11.230837818), (-19.351377941, -18.999086285))
            Line((-19.351377941, -18.999086285), (2.54103708, -18.999086285))
            Line((2.54103708, -18.999086285), (4.312298946, -11.230837818))
            ThreePointArc((4.312298946, -11.230837818), (8.246380489, -8.403768093), (6.679295591, -3.819712493))
            ThreePointArc((6.679295591, -3.819712493), (7.52584405, 2.546364848), (5.417371527, 8.612494473))
            ThreePointArc((5.417371527, 8.612494473), (4.777900687, 13.775696815), (-0.415899, 14.079054992))
        make_face()
    extrude(amount=BOSS_EXTRUDE23_DEPTH)



with BuildPart() as body_9:
    # Sketch32 → Boss-Extrude24 (new body)
    with BuildSketch(Plane(origin=(0, 0, -179.022), x_dir=(-1, 0, 0), z_dir=(0, 0, -1))):
        with Locations((-8.40517043, 0.312983004)):
            Circle(SKETCH32_R)
    extrude(amount=BOSS_EXTRUDE24_DEPTH)


with BuildPart() as body_8_1:
    add(body_8.part)

    add(body_9.part)  # Boss-Extrude26 merges body 9
    # Sketch43 → Boss-Extrude26 (add)
    with BuildSketch(Plane(origin=(0, 0, -179.022), x_dir=(-1, 0, 0), z_dir=(0, 0, -1))):
        with Locations((-18.809281307, 10.810317247)):
            Circle(SKETCH43_R)
        with Locations((1.998940446, 10.810317247)):
            Circle(SKETCH43_R)
        with Locations((-21.185378257, -7.167322113)):
            Circle(SKETCH43_R)
        with Locations((4.375037396, -7.167322113)):
            Circle(SKETCH43_R)
    extrude(amount=BOSS_EXTRUDE26_DEPTH)

    # Fillet13
    fillet13_edges = [body_8_1.edges().sort_by_distance(p)[0] for p in [
        (22.365281307, 10.810317247, -181.562),
        (1.557059554, 10.810317247, -181.562),
        (24.741378257, -7.167322113, -181.562),
        (-0.819037396, -7.167322113, -181.562),
    ]]
    fillet(fillet13_edges, radius=FILLET13_R)


with BuildPart() as cut_extrude11_tool:
    # Sketch34 → Cut-Extrude11 (new body)
    with BuildSketch(Plane(origin=(0, 0, -187.15), x_dir=(-1, 0, 0), z_dir=(0, 0, -1))):
        with Locations((-8.40517043, 0.312983004)):
            Circle(SKETCH34_R)
    extrude(amount=-CUT_EXTRUDE11_DEPTH)


with BuildPart() as body_7_1:
    add(body_7.part)

    # Cut-Extrude11: cut by cut_extrude11_tool
    add(cut_extrude11_tool.part, mode=Mode.SUBTRACT)


with BuildPart() as body_8_2:
    add(body_8_1.part)

    # Cut-Extrude11: cut by cut_extrude11_tool
    add(cut_extrude11_tool.part, mode=Mode.SUBTRACT)


solid = Compound([part.part, body_2.part, body_3.part, body_4.part, body_5.part, body_6.part, body_7_1.part, body_8_2.part])
